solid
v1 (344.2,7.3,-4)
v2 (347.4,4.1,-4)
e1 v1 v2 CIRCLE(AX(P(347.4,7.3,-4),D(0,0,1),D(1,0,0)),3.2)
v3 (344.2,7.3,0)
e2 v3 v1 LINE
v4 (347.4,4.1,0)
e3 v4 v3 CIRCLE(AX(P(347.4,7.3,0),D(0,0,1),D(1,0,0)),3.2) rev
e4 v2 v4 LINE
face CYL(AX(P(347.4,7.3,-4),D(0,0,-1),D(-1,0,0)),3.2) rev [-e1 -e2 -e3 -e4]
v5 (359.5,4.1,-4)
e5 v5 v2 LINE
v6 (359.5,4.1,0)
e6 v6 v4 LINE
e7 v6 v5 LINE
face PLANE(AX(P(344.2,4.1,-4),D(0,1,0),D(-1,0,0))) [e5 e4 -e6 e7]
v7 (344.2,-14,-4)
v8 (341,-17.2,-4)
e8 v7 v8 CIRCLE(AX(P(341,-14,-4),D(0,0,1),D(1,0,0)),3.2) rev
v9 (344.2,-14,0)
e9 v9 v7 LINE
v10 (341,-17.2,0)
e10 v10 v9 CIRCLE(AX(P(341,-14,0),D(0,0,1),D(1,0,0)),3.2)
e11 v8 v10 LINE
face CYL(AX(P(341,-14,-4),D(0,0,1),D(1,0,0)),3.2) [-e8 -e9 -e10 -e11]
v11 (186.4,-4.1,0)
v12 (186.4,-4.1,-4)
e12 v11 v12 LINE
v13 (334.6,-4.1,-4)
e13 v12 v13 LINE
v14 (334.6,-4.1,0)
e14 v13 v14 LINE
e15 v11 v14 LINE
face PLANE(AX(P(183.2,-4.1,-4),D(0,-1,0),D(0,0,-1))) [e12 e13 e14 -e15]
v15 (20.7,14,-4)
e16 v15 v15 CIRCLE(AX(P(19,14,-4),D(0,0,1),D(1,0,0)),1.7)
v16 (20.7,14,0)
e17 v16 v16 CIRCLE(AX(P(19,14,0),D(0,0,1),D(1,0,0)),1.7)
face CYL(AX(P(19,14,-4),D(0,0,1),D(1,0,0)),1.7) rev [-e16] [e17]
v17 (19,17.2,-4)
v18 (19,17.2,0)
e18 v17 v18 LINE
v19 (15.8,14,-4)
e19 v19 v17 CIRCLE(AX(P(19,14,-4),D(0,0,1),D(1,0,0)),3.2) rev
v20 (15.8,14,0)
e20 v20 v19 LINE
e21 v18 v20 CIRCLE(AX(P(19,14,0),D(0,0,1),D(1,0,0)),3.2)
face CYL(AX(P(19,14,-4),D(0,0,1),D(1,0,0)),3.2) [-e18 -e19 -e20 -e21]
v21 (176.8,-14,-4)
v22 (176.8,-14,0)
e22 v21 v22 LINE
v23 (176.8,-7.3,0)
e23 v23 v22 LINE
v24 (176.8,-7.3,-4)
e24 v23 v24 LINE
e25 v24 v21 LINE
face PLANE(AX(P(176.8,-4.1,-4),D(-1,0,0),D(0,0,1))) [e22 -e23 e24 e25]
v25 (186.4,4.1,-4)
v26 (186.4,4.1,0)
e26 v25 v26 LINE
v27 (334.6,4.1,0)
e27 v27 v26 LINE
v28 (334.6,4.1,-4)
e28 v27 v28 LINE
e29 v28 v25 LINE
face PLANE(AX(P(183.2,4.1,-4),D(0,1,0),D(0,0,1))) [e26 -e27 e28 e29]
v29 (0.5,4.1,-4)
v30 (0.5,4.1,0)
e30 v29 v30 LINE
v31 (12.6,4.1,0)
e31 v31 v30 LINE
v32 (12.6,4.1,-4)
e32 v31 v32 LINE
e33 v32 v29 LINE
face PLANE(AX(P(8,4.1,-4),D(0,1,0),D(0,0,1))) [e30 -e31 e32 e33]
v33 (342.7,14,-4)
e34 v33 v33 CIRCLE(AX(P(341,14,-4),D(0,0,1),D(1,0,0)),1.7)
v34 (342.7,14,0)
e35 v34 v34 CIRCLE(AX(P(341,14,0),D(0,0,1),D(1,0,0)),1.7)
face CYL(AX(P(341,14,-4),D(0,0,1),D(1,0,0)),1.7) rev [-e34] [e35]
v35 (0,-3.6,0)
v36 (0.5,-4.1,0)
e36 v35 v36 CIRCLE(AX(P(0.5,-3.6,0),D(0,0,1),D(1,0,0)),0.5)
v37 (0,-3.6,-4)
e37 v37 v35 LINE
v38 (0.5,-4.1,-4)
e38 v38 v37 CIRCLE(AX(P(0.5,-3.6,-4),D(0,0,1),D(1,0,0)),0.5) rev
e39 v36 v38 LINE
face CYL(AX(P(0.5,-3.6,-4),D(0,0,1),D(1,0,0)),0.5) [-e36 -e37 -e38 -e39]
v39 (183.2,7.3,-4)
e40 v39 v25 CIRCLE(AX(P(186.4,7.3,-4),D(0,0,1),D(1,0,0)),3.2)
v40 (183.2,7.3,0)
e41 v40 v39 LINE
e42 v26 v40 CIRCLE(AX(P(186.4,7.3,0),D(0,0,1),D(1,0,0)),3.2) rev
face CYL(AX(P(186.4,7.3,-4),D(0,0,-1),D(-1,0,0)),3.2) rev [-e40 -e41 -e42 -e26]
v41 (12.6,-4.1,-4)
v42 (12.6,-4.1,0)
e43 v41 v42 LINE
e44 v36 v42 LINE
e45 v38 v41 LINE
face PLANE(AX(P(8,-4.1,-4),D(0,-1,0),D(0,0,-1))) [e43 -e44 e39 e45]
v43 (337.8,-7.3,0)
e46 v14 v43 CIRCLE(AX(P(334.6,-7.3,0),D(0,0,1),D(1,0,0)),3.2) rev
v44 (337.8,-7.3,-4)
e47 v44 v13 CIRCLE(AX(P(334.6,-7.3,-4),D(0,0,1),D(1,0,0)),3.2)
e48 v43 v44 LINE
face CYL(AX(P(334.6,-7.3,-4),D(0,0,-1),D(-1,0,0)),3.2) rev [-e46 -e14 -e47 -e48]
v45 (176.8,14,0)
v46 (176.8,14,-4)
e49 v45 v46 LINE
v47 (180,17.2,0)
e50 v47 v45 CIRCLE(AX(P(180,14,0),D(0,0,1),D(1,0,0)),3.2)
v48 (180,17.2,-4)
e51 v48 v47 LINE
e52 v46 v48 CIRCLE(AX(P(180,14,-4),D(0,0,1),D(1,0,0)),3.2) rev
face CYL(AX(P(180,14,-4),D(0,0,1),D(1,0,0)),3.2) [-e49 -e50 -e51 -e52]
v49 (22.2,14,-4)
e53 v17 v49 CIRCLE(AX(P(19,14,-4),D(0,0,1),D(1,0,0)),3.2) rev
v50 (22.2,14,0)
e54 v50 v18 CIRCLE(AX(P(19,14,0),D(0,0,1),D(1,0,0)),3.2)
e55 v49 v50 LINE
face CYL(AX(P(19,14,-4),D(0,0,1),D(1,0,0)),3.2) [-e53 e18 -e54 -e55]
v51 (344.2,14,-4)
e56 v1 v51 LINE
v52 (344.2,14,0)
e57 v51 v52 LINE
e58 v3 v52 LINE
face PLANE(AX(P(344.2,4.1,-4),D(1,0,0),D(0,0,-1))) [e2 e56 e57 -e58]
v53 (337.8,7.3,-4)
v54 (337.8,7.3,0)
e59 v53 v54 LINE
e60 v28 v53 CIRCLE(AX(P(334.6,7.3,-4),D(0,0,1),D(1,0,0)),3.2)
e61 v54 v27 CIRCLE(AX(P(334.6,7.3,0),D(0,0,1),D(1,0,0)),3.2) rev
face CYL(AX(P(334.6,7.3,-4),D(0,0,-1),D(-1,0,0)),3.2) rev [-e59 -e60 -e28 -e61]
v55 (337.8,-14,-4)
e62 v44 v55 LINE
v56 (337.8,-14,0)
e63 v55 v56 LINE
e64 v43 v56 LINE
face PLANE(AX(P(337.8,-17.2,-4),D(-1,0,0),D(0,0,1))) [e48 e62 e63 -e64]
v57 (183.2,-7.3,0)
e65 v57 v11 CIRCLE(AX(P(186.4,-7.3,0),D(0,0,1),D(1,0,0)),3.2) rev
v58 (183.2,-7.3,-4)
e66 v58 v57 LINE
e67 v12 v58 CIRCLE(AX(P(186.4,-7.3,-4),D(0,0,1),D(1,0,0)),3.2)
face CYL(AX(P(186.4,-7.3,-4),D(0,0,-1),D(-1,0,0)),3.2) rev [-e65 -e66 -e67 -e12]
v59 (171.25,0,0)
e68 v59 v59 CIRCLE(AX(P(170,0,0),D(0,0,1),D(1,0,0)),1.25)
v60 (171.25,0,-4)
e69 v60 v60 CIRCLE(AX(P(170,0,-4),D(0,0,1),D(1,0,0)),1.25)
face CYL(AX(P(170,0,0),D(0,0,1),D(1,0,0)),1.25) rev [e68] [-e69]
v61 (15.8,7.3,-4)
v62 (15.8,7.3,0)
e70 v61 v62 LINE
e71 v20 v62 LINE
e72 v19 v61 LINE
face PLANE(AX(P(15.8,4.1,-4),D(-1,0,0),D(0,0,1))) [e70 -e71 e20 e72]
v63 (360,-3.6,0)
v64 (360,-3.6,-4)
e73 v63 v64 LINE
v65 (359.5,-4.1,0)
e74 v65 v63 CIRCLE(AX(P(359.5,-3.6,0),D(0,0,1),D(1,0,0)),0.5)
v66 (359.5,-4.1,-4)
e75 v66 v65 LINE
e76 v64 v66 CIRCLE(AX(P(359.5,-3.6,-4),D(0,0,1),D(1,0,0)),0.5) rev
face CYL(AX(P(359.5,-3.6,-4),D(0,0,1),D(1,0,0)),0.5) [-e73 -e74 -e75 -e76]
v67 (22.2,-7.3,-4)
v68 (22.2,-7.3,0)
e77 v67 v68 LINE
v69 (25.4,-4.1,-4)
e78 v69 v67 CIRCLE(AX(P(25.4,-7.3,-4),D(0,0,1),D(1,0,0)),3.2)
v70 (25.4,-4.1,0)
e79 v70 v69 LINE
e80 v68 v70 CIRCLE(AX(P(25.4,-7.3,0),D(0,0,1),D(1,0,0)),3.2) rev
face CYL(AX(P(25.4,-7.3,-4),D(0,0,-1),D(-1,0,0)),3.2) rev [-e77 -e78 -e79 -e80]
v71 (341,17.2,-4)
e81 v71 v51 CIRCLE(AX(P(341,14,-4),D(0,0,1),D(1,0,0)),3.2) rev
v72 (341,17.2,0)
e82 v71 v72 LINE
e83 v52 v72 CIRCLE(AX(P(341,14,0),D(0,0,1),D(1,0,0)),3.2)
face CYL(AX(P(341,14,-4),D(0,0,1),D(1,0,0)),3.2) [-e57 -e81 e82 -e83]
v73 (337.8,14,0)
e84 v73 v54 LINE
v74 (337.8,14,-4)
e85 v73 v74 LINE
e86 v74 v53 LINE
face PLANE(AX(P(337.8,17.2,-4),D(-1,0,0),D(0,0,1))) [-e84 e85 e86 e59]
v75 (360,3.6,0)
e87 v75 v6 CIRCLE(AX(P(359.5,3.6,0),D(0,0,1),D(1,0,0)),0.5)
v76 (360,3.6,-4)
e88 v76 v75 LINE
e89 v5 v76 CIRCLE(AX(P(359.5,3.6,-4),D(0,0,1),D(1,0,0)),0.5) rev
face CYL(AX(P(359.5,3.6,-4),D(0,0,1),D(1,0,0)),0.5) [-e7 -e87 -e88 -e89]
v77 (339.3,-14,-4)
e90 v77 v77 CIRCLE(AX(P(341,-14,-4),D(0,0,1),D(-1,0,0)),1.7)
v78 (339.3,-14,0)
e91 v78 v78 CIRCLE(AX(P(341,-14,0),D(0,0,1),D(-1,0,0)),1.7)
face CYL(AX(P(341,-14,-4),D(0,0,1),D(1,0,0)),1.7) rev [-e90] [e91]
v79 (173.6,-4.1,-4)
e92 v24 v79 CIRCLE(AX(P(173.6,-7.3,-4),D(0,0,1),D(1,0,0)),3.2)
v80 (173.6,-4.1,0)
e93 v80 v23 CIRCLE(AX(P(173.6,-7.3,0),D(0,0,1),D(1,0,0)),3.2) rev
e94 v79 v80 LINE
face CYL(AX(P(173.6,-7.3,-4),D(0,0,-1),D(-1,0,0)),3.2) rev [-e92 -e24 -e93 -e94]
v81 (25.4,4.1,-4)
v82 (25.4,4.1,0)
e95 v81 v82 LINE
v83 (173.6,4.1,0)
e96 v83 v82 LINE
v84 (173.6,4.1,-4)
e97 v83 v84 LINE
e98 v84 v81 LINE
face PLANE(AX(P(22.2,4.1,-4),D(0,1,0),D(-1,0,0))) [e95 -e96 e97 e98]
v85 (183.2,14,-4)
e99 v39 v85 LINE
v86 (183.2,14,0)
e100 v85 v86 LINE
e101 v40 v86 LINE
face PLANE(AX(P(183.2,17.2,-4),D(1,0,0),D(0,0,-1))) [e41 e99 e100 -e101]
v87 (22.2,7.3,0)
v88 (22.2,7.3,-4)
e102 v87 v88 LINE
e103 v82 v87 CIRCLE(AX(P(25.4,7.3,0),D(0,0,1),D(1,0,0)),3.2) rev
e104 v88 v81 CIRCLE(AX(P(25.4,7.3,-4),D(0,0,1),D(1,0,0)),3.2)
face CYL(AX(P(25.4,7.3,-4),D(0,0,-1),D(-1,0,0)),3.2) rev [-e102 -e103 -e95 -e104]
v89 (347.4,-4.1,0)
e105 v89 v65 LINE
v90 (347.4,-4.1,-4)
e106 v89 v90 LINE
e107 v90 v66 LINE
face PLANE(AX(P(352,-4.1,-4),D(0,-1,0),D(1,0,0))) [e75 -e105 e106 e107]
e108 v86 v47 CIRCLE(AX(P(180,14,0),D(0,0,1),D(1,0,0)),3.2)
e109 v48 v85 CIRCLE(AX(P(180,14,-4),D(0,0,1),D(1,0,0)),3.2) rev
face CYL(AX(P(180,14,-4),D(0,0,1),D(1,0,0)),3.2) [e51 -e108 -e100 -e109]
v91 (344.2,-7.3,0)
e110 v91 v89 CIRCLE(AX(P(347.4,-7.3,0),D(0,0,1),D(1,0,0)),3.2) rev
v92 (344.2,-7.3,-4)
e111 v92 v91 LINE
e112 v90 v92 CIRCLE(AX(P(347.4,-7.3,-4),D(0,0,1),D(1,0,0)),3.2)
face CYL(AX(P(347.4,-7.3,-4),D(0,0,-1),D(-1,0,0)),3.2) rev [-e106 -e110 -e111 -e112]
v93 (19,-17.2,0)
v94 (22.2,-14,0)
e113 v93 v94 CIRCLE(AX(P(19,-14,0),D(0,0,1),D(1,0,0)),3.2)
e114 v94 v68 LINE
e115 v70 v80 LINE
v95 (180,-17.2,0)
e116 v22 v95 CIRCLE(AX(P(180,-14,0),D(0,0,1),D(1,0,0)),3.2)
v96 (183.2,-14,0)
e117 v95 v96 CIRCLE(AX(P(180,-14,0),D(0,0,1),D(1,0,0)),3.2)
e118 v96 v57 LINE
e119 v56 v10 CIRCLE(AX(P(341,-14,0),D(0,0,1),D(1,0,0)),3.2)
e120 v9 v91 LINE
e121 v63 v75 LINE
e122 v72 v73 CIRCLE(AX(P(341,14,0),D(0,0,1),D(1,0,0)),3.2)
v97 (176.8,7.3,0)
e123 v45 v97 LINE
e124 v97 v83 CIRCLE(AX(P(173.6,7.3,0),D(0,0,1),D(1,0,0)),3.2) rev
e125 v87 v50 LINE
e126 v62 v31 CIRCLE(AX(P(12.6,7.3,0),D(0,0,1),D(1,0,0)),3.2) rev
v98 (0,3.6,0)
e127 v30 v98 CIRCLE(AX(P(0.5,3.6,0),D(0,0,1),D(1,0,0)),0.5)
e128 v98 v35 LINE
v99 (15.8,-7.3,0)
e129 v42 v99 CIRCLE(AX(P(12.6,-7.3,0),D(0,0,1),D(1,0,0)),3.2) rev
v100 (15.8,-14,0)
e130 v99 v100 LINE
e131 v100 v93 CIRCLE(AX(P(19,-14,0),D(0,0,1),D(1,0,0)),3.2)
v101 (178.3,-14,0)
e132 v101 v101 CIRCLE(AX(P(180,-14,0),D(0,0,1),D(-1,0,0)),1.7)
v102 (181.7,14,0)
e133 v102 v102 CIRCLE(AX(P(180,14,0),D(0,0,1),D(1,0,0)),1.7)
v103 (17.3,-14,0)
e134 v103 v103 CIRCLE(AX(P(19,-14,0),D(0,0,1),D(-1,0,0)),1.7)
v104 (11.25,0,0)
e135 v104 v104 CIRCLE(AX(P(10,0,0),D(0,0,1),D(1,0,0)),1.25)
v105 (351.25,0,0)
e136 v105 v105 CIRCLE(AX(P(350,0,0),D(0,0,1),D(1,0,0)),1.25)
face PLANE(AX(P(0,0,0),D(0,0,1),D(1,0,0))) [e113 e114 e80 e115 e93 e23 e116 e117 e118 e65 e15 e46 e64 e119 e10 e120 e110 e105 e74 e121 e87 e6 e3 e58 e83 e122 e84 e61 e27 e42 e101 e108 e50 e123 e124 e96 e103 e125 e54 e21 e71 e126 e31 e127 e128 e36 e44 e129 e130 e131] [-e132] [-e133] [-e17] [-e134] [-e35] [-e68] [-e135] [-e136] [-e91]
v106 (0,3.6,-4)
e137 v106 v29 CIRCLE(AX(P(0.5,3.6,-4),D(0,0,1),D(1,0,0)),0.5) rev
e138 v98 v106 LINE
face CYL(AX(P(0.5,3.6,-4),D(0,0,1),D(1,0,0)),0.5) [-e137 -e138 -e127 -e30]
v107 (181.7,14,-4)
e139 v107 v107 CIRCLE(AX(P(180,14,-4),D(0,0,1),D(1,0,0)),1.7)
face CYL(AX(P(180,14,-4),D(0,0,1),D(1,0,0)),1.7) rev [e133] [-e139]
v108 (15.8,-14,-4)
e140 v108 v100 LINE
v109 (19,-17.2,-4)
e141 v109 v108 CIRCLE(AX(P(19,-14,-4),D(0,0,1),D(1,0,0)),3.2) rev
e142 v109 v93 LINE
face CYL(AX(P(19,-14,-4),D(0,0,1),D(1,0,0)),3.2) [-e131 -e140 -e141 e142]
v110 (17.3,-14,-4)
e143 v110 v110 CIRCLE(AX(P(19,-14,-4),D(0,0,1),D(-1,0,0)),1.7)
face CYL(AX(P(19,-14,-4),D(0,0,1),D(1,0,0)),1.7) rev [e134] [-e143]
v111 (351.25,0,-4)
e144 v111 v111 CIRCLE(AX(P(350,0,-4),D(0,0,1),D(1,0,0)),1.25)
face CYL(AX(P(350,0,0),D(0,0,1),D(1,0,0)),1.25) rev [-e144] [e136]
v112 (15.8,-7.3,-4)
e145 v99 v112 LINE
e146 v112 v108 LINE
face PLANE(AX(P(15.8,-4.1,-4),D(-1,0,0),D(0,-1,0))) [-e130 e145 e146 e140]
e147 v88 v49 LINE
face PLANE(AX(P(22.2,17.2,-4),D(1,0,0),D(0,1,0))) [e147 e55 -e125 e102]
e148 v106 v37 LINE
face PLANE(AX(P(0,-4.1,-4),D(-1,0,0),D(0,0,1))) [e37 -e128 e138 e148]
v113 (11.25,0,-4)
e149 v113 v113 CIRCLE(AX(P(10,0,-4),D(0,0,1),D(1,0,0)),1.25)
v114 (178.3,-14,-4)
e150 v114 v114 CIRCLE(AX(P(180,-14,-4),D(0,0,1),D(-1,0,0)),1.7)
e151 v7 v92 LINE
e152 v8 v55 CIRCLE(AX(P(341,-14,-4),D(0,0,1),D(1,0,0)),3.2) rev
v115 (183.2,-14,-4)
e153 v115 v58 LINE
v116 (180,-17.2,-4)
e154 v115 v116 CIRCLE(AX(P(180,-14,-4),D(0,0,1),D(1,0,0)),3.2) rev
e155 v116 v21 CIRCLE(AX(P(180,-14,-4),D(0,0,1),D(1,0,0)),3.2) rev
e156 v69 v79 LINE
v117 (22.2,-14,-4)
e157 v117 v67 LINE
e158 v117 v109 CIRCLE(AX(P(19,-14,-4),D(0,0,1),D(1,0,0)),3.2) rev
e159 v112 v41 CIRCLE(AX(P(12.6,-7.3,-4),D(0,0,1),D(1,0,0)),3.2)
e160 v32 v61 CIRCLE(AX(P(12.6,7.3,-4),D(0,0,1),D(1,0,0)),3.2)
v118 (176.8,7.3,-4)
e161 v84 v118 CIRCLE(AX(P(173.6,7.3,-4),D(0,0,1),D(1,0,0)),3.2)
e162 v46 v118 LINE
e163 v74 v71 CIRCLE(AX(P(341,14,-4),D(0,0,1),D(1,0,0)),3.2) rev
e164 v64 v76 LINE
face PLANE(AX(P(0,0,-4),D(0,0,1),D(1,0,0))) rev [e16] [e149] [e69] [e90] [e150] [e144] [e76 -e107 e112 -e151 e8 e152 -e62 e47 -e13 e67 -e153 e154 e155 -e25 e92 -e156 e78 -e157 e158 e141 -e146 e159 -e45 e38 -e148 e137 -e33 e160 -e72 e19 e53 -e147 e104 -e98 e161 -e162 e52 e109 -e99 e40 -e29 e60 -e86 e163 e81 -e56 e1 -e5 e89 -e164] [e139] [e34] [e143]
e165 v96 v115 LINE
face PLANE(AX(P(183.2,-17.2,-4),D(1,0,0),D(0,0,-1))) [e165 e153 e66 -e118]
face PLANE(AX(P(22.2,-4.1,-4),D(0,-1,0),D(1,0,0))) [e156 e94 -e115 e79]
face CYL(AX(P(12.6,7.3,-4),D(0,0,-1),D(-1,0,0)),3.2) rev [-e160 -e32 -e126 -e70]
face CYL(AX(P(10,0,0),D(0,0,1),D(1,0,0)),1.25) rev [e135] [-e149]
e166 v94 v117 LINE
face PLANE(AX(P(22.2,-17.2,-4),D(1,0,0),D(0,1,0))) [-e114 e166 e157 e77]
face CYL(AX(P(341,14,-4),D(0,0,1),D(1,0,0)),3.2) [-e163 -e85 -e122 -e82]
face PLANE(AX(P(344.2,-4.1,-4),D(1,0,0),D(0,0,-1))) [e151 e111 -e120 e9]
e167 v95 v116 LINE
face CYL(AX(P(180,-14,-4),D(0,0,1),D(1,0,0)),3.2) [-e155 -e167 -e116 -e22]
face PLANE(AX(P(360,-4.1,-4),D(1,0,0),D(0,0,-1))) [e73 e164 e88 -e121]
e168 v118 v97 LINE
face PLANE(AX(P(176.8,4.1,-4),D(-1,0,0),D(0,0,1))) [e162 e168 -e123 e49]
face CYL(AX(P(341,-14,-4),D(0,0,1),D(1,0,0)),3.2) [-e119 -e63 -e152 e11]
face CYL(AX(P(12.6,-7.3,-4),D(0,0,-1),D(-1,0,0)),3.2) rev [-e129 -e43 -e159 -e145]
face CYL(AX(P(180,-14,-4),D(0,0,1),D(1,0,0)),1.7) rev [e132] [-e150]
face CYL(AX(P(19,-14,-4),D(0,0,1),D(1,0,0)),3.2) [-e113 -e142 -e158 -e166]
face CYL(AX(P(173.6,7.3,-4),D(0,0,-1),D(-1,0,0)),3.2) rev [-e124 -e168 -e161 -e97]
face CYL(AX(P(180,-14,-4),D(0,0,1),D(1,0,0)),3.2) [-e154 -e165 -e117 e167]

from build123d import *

# Parameters (mm, degrees)
BRIDA_BASE1_DEPTH     = 4
CROQUIS6_R            = 1.2
CORTAR_EXTRUIR1_DEPTH = 361.432850889
TALADRO_ROSCADO_M3_D  = 2.5
CROQUIS11_R           = 1.7
CORTAR_EXTRUIR2_DEPTH = 361.432850889
REDONDEO1_START       = -5
REDONDEO1_DEPTH       = 6
REDONDEO1_START_2     = -4
REDONDEO1_2_DEPTH     = 4
REDONDEO2_R           = 0.5


with BuildPart() as part:
    # Brida base1: sheet metal written as solids
    # Croquis1 → Brida base1 (new body)
    with BuildSketch(Plane.XY):
        Polygon((0, -4.1), (0, 4.1), (8, 4.1), (15.8, 4.1), (15.8, 17.2), (22.2, 17.2), (22.2, 4.1), (176.8, 4.1), (176.8, 17.2), (183.2, 17.2), (183.2, 4.1), (337.8, 4.1), (337.8, 17.2), (344.2, 17.2), (344.2, 4.1), (352, 4.1), (360, 4.1), (360, -4.1), (352, -4.1), (344.2, -4.1), (344.2, -17.2), (337.8, -17.2), (337.8, -4.1), (183.2, -4.1), (183.2, -17.2), (176.8, -17.2), (176.8, -4.1), (22.2, -4.1), (22.2, -17.2), (15.8, -17.2), (15.8, -4.1), (8, -4.1), align=None)
    extrude(amount=-BRIDA_BASE1_DEPTH)

    # Croquis6 → Cortar-Extruir1 (cut, through all)
    with BuildSketch(Plane.XY):
        with Locations((10, 0)):
            Circle(CROQUIS6_R)
        with Locations((350, 0)):
            Circle(CROQUIS6_R)
        with Locations((170, 0)):
            Circle(CROQUIS6_R)
    extrude(amount=-CORTAR_EXTRUIR1_DEPTH, mode=Mode.SUBTRACT)

    # Taladro roscado M3 (through all)
    with Locations(Plane.XY):
        with Locations((10, 0), (170, 0), (350, 0)):
            Hole(TALADRO_ROSCADO_M3_D / 2)

    # Croquis11 → Cortar-Extruir2 (cut, through all)
    with BuildSketch(Plane.XY):
        with Locations((19, 14)):
            Circle(CROQUIS11_R)
        with Locations((180, 14)):
            Circle(CROQUIS11_R)
        with Locations((341, 14)):
            Circle(CROQUIS11_R)
        with Locations(Location((341, -14, 0), (0, 0, 180))):
            Circle(CROQUIS11_R)
        with Locations(Location((180, -14, 0), (0, 0, 180))):
            Circle(CROQUIS11_R)
        with Locations(Location((19, -14, 0), (0, 0, 180))):
            Circle(CROQUIS11_R)
    extrude(amount=-CORTAR_EXTRUIR2_DEPTH, mode=Mode.SUBTRACT)

    # Redondeo1: read off the stored shape, not the designer's step
    # Redondeo1 outline → Redondeo1 (cut)
    with BuildSketch(Plane.XY.offset(REDONDEO1_START)):
        with BuildLine():
            ThreePointArc((15.8, 14), (16.7372583, 16.2627417), (19, 17.2))
            Line((19, 17.2), (15.8, 17.2))
            Line((15.8, 17.2), (15.8, 14))
        make_face()
        with BuildLine():
            ThreePointArc((19, 17.2), (21.2627417, 16.2627417), (22.2, 14))
            Line((22.2, 14), (22.2, 17.2))
            Line((22.2, 17.2), (19, 17.2))
        make_face()
        with BuildLine():
            ThreePointArc((176.8, 14), (177.7372583, 16.2627417), (180, 17.2))
            Line((180, 17.2), (176.8, 17.2))
            Line((176.8, 17.2), (176.8, 14))
        make_face()
        with BuildLine():
            ThreePointArc((180, 17.2), (182.2627417, 16.2627417), (183.2, 14))
            Line((183.2, 14), (183.2, 17.2))
            Line((183.2, 17.2), (180, 17.2))
        make_face()
        with BuildLine():
            ThreePointArc((337.8, 14), (338.7372583, 16.2627417), (341, 17.2))
            Line((341, 17.2), (337.8, 17.2))
            Line((337.8, 17.2), (337.8, 14))
        make_face()
        with BuildLine():
            ThreePointArc((341, 17.2), (343.2627417, 16.2627417), (344.2, 14))
            Line((344.2, 14), (344.2, 17.2))
            Line((344.2, 17.2), (341, 17.2))
        make_face()
        with BuildLine():
            ThreePointArc((344.2, -14), (343.2627417, -16.2627417), (341, -17.2))
            Line((341, -17.2), (344.2, -17.2))
            Line((344.2, -17.2), (344.2, -14))
        make_face()
        with BuildLine():
            ThreePointArc((341, -17.2), (338.7372583, -16.2627417), (337.8, -14))
            Line((337.8, -14), (337.8, -17.2))
            Line((337.8, -17.2), (341, -17.2))
        make_face()
        with BuildLine():
            ThreePointArc((183.2, -14), (182.2627417, -16.2627417), (180, -17.2))
            Line((180, -17.2), (183.2, -17.2))
            Line((183.2, -17.2), (183.2, -14))
        make_face()
        with BuildLine():
            ThreePointArc((180, -17.2), (177.7372583, -16.2627417), (176.8, -14))
            Line((176.8, -14), (176.8, -17.2))
            Line((176.8, -17.2), (180, -17.2))
        make_face()
        with BuildLine():
            ThreePointArc((22.2, -14), (21.2627417, -16.2627417), (19, -17.2))
            Line((19, -17.2), (22.2, -17.2))
            Line((22.2, -17.2), (22.2, -14))
        make_face()
        with BuildLine():
            ThreePointArc((19, -17.2), (16.7372583, -16.2627417), (15.8, -14))
            Line((15.8, -14), (15.8, -17.2))
            Line((15.8, -17.2), (19, -17.2))
        make_face()
    extrude(amount=REDONDEO1_DEPTH, mode=Mode.SUBTRACT)

    # Redondeo1 2 outline → Redondeo1 2 (add)
    with BuildSketch(Plane.XY.offset(REDONDEO1_START_2)):
        with BuildLine():
            Line((344.2, 4.1), (347.4, 4.1))
            ThreePointArc((347.4, 4.1), (345.1372583, 5.0372583), (344.2, 7.3))
            Line((344.2, 7.3), (344.2, 4.1))
        make_face()
        with BuildLine():
            Line((15.8, 4.1), (15.8, 7.3))
            ThreePointArc((15.8, 7.3), (14.8627417, 5.0372583), (12.6, 4.1))
            Line((12.6, 4.1), (15.8, 4.1))
        make_face()
        with BuildLine():
            Line((22.2, 4.1), (25.4, 4.1))
            ThreePointArc((25.4, 4.1), (23.1372583, 5.0372583), (22.2, 7.3))
            Line((22.2, 7.3), (22.2, 4.1))
        make_face()
        with BuildLine():
            Line((176.8, 4.1), (176.8, 7.3))
            ThreePointArc((176.8, 7.3), (175.8627417, 5.0372583), (173.6, 4.1))
            Line((173.6, 4.1), (176.8, 4.1))
        make_face()
        with BuildLine():
            Line((183.2, 4.1), (186.4, 4.1))
            ThreePointArc((186.4, 4.1), (184.1372583, 5.0372583), (183.2, 7.3))
            Line((183.2, 7.3), (183.2, 4.1))
        make_face()
        with BuildLine():
            Line((337.8, 4.1), (337.8, 7.3))
            ThreePointArc((337.8, 7.3), (336.8627417, 5.0372583), (334.6, 4.1))
            Line((334.6, 4.1), (337.8, 4.1))
        make_face()
        with BuildLine():
            Line((15.8, -4.1), (12.6, -4.1))
            ThreePointArc((12.6, -4.1), (14.8627417, -5.0372583), (15.8, -7.3))
            Line((15.8, -7.3), (15.8, -4.1))
        make_face()
        with BuildLine():
            Line((344.2, -4.1), (344.2, -7.3))
            ThreePointArc((344.2, -7.3), (345.1372583, -5.0372583), (347.4, -4.1))
            Line((347.4, -4.1), (344.2, -4.1))
        make_face()
        with BuildLine():
            Line((337.8, -4.1), (334.6, -4.1))
            ThreePointArc((334.6, -4.1), (336.8627417, -5.0372583), (337.8, -7.3))
            Line((337.8, -7.3), (337.8, -4.1))
        make_face()
        with BuildLine():
            Line((183.2, -4.1), (183.2, -7.3))
            ThreePointArc((183.2, -7.3), (184.1372583, -5.0372583), (186.4, -4.1))
            Line((186.4, -4.1), (183.2, -4.1))
        make_face()
        with BuildLine():
            Line((176.8, -4.1), (173.6, -4.1))
            ThreePointArc((173.6, -4.1), (175.8627417, -5.0372583), (176.8, -7.3))
            Line((176.8, -7.3), (176.8, -4.1))
        make_face()
        with BuildLine():
            Line((22.2, -4.1), (22.2, -7.3))
            ThreePointArc((22.2, -7.3), (23.1372583, -5.0372583), (25.4, -4.1))
            Line((25.4, -4.1), (22.2, -4.1))
        make_face()
    extrude(amount=REDONDEO1_2_DEPTH)

    # Redondeo2
    redondeo2_edges = [part.edges().sort_by_distance(p)[0] for p in [
        (0, -4.1, -2),
        (0, 4.1, -2),
        (360, 4.1, -2),
        (360, -4.1, -2),
    ]]
    fillet(redondeo2_edges, radius=REDONDEO2_R)


solid = part.part
